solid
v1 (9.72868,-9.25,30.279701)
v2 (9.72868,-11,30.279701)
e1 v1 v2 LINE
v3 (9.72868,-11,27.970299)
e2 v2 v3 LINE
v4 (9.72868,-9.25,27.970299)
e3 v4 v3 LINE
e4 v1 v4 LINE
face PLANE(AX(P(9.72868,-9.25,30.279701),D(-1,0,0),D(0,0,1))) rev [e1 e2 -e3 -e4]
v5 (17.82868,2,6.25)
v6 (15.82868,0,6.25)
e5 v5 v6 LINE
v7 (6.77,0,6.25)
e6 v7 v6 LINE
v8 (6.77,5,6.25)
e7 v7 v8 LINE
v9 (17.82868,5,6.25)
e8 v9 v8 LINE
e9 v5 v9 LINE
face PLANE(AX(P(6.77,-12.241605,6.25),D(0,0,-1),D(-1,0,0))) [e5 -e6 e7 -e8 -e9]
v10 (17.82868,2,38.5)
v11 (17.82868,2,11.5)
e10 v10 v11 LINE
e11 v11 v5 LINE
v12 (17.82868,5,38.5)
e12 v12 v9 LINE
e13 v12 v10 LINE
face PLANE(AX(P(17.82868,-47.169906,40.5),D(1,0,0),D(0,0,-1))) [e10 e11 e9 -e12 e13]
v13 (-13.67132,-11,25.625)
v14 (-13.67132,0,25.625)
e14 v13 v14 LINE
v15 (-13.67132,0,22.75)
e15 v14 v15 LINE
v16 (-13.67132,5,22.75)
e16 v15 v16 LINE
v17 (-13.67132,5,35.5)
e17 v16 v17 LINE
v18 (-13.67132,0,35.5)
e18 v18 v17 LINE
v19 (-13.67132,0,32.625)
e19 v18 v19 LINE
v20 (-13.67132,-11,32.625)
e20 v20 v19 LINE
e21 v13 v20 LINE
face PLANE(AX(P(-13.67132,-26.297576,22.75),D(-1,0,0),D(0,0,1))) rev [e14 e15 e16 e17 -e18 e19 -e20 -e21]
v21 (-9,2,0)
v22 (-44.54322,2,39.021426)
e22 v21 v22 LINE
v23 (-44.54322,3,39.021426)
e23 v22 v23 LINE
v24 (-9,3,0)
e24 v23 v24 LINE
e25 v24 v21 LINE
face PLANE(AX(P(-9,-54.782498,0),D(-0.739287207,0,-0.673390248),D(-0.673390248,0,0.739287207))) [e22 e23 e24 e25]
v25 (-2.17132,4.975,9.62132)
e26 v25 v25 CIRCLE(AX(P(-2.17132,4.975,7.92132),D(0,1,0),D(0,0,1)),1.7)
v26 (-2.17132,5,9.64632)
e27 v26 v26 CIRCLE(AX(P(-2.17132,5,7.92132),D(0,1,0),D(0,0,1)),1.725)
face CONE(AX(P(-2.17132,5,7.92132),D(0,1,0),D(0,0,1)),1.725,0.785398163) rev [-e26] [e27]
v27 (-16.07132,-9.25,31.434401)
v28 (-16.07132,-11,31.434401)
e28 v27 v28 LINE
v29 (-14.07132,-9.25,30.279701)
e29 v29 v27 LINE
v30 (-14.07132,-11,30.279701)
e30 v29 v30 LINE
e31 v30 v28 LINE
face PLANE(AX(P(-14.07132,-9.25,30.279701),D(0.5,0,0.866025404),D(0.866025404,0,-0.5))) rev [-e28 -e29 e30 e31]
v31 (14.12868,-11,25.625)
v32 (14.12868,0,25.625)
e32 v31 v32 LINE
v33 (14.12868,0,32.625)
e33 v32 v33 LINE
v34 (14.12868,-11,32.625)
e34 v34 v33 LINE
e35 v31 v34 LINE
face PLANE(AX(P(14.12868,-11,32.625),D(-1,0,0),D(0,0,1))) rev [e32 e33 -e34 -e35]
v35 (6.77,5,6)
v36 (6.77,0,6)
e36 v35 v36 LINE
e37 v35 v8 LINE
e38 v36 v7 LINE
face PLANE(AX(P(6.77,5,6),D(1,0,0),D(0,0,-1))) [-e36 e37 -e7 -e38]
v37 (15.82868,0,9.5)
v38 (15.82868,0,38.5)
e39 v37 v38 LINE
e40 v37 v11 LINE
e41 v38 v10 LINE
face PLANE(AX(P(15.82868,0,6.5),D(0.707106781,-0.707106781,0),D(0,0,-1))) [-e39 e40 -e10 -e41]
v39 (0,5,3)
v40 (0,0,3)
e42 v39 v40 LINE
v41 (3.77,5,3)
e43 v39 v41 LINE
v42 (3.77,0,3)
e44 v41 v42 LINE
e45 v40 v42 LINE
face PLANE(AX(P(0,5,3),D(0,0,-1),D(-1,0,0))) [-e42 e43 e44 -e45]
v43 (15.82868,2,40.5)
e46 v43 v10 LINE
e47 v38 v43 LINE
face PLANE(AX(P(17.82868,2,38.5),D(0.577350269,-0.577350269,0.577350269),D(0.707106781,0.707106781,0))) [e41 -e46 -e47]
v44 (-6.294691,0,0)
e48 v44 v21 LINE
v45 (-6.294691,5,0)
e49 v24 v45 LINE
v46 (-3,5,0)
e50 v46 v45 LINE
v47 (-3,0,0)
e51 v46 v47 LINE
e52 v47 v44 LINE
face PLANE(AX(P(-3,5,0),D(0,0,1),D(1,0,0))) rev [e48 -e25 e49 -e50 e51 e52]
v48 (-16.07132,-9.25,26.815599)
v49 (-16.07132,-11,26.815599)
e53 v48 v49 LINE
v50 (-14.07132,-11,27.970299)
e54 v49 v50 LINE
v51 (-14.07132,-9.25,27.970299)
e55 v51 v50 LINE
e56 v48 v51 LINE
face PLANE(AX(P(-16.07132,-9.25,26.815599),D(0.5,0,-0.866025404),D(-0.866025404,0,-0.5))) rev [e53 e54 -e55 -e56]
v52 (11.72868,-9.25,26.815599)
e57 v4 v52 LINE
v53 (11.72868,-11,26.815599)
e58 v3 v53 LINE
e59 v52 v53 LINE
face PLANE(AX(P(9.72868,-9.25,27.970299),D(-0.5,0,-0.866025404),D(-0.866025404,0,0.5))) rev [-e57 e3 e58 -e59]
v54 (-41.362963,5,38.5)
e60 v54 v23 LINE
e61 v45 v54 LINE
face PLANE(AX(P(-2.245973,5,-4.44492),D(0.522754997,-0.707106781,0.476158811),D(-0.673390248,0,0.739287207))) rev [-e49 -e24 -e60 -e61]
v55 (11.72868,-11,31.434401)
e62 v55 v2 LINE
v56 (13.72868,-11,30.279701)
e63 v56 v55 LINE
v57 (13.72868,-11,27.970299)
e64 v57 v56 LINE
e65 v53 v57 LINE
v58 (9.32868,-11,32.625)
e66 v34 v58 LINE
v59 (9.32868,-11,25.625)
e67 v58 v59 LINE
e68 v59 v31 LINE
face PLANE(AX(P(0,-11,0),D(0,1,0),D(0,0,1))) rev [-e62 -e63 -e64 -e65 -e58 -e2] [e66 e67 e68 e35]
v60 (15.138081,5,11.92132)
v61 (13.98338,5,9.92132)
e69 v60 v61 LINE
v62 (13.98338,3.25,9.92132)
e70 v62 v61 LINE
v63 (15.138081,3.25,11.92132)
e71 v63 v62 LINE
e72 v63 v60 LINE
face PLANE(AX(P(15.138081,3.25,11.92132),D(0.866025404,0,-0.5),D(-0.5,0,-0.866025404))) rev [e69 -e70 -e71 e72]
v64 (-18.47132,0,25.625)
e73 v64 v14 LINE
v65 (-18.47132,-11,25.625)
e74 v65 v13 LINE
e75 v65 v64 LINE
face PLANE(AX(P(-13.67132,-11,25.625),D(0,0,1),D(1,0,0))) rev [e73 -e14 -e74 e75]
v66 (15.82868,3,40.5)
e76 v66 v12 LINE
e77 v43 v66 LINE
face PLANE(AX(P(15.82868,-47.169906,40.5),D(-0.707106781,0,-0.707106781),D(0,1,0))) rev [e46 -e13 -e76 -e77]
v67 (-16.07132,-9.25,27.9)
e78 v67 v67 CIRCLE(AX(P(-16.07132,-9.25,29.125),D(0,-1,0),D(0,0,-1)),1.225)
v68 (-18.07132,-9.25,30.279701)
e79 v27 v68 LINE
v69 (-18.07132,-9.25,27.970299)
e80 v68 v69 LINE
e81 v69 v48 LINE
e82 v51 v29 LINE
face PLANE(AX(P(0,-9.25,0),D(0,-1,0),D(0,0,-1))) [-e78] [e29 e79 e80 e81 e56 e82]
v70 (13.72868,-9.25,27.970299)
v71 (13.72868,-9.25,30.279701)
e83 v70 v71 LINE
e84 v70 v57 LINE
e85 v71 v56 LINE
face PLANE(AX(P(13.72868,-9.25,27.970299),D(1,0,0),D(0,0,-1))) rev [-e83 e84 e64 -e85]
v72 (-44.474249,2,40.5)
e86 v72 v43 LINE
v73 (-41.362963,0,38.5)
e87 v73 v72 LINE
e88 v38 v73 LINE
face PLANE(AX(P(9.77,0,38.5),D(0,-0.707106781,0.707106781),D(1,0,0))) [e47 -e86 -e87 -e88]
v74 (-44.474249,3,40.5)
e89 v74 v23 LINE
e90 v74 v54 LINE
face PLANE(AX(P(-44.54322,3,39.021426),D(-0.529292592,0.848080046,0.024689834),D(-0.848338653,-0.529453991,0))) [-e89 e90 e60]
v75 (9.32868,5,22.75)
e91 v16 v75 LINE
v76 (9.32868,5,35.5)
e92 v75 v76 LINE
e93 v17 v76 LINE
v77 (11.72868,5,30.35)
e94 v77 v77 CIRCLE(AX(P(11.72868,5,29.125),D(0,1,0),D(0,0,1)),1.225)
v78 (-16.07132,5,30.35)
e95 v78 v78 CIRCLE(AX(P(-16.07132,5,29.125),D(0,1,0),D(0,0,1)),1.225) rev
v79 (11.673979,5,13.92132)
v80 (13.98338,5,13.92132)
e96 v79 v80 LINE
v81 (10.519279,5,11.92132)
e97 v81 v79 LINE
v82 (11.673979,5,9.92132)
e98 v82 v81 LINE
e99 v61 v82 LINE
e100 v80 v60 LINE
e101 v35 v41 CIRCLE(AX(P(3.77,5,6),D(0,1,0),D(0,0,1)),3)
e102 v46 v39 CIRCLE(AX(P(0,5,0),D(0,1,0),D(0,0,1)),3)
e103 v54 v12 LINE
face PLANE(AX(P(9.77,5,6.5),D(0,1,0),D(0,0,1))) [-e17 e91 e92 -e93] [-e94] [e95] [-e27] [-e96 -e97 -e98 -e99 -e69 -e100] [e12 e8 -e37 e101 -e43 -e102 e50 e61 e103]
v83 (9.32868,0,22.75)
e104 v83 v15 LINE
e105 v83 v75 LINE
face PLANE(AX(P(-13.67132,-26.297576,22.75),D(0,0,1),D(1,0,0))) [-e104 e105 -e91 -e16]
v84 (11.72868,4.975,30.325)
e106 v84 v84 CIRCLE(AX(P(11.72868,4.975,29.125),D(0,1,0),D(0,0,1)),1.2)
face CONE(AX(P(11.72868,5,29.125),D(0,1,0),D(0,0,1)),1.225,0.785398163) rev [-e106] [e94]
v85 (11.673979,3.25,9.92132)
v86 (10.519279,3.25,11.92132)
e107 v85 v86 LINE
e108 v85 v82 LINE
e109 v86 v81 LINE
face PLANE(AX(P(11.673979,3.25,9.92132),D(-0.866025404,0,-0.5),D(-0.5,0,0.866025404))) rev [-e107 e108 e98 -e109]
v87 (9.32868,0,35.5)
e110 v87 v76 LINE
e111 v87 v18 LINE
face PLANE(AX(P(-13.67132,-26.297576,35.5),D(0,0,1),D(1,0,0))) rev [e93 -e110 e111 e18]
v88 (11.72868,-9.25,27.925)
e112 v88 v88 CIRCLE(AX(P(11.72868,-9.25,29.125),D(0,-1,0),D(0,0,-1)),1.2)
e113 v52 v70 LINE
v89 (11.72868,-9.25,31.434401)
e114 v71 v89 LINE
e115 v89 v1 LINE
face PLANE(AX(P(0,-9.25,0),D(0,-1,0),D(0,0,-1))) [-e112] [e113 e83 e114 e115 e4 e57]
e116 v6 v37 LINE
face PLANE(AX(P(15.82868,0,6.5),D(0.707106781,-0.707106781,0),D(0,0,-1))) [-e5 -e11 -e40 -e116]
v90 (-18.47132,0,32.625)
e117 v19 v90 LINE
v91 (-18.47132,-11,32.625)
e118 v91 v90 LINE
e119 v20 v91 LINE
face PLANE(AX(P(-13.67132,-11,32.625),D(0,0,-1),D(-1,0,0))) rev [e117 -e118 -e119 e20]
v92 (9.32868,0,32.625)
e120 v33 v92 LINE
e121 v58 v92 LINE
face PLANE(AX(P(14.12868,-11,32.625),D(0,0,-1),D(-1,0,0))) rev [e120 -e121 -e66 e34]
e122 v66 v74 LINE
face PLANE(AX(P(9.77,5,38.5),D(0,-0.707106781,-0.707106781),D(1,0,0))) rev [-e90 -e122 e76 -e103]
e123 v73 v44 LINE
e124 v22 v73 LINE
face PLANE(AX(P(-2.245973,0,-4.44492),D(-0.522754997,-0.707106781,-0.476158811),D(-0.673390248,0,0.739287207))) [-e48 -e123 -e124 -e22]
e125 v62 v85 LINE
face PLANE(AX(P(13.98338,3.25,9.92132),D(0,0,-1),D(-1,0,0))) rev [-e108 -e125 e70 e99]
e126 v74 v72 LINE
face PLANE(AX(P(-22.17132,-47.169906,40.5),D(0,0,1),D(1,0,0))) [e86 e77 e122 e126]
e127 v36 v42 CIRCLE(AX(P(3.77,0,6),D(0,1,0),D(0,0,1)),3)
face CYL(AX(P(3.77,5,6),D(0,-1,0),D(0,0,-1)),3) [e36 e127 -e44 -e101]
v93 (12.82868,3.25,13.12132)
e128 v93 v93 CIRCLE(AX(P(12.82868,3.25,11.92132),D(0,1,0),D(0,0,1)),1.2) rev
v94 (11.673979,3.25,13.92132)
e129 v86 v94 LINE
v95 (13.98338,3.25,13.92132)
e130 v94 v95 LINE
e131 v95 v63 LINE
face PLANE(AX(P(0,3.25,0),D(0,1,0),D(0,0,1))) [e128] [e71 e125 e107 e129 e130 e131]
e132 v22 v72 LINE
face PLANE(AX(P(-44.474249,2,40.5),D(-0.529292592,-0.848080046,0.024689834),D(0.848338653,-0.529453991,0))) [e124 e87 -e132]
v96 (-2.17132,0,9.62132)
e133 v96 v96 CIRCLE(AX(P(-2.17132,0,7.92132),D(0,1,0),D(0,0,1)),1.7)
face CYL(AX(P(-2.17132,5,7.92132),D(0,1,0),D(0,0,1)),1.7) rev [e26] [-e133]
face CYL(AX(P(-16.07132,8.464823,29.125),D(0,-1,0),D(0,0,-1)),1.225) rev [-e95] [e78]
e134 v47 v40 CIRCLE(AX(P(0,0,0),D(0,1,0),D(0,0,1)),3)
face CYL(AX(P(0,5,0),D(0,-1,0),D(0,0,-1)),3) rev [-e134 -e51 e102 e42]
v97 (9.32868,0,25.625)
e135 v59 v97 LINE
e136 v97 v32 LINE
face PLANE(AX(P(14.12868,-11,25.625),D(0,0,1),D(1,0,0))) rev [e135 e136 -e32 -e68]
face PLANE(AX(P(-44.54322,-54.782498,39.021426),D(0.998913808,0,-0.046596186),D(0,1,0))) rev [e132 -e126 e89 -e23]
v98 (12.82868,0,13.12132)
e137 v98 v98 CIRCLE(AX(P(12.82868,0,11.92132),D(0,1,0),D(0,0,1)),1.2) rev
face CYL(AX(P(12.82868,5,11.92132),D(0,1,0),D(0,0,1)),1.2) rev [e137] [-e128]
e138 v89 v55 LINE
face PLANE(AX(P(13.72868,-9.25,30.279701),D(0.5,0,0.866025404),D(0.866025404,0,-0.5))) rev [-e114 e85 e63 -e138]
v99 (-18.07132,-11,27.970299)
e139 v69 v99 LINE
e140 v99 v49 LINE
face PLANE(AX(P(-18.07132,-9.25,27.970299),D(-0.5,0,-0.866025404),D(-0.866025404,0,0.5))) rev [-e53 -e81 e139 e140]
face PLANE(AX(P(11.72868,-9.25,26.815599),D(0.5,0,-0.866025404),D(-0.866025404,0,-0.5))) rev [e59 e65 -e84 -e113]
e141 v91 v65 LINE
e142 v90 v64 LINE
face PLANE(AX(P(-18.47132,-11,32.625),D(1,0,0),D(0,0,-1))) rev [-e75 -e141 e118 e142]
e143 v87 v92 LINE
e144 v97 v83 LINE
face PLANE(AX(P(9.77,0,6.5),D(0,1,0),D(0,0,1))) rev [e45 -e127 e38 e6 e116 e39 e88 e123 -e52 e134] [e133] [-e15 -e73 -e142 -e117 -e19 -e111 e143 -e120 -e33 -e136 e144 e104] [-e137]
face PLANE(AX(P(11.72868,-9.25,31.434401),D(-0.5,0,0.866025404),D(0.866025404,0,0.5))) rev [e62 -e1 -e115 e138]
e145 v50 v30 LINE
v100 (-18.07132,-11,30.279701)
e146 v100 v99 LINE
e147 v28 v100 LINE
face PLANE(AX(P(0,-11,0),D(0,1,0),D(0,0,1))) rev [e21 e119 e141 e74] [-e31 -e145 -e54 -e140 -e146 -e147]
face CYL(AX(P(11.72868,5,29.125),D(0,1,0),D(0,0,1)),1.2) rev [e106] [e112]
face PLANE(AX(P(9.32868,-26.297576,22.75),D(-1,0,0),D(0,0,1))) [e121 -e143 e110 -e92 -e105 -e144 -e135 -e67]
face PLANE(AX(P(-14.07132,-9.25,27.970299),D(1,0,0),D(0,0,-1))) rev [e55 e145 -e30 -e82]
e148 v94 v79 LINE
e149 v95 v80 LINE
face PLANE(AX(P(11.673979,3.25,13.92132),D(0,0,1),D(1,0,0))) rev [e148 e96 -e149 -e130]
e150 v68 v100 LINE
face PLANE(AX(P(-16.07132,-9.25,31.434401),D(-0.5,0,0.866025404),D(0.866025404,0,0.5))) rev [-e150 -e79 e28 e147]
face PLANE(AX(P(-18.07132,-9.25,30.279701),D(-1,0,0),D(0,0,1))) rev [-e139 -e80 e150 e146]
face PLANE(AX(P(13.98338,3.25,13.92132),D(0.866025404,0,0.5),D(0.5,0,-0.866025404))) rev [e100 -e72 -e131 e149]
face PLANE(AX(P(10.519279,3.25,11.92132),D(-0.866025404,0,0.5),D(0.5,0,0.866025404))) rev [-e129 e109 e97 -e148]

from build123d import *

# Parameters (mm, degrees)
BOSS_EXTRUDE1_DEPTH            = 5
M3_CLEARANCE_HOLE1_D           = 3.4
M3_CLEARANCE_HOLE1_CSINK_D     = 3.45
M3_CLEARANCE_HOLE1_CSINK_ANGLE = 90
SKETCH4_W                      = 40
SKETCH4_H                      = 25
BOSS_EXTRUDE2_DEPTH            = 5
SKETCH5_W                      = 8.058679656
SKETCH5_H                      = 6
BOSS_EXTRUDE3_DEPTH            = 5
SKETCH8_W                      = 23
SKETCH8_H                      = 12.75
CUT_EXTRUDE1_DEPTH             = 5
M2_CLEARANCE_HOLE1_D           = 2.4
M2_CLEARANCE_HOLE1_CSINK_D     = 2.45
M2_CLEARANCE_HOLE1_CSINK_ANGLE = 90
SKETCH11_W                     = 4.8
SKETCH11_H                     = 7
BOSS_EXTRUDE4_DEPTH            = 11
CUT_EXTRUDE2_DEPTH             = 1.75
SKETCH13_R                     = 1.225
SKETCH13_R_2                   = 1.2
CUT_EXTRUDE3_DEPTH             = 14.25
M2_CLEARANCE_HOLE2_D           = 2.4
M2_CLEARANCE_HOLE2_DEPTH       = 5
M2_CLEARANCE_HOLE2_CSINK_D     = 2.45
M2_CLEARANCE_HOLE2_CSINK_ANGLE = 90
M2_CLEARANCE_HOLE2_TIP         = 0.721032743
CUT_EXTRUDE4_DEPTH             = 1.75
BOSS_EXTRUDE5_START            = -5
BOSS_EXTRUDE5_DEPTH            = 5
CHAMFER2_SIZE                  = 2


with BuildPart() as part:
    # Sketch1 → Boss-Extrude1 (new body)
    with BuildSketch(Plane(origin=(0, 0, 0), x_dir=(1, 0, 0), z_dir=(0, 1, 0))):
        with BuildLine():
            Line((-3, 0), (-9, 0))
            Line((-9, 0), (-9, -15.5))
            Line((-9, -15.5), (9.77, -15.5))
            Line((9.77, -15.5), (9.77, -9.5))
            ThreePointArc((9.77, -9.5), (7.648679656, -8.621320344), (6.77, -6.5))
            Line((6.77, -6.5), (6.77, -6))
            ThreePointArc((6.77, -6), (5.891320344, -3.878679656), (3.77, -3))
            Line((3.77, -3), (0, -3))
            ThreePointArc((0, -3), (-2.121320344, -2.121320344), (-3, 0))
        make_face()
    extrude(amount=BOSS_EXTRUDE1_DEPTH)

    # M3 Clearance Hole1 (through all)
    with Locations(Plane(origin=(0, 5, 0), x_dir=(1, 0, 0), z_dir=(0, 1, 0))):
        with Locations((-2.171320344, -7.921320344)):
            CounterSinkHole(M3_CLEARANCE_HOLE1_D / 2, M3_CLEARANCE_HOLE1_CSINK_D / 2, counter_sink_angle=M3_CLEARANCE_HOLE1_CSINK_ANGLE)

    # Sketch4 → Boss-Extrude2 (add)
    with BuildSketch(Plane(origin=(0, 5, 0), x_dir=(1, 0, 0), z_dir=(0, 1, 0))):
        with Locations((-2.171320344, -28)):
            Rectangle(SKETCH4_W, SKETCH4_H)
    extrude(amount=-BOSS_EXTRUDE2_DEPTH)

    # Sketch5 → Boss-Extrude3 (add)
    with BuildSketch(Plane(origin=(0, 5, 0), x_dir=(1, 0, 0), z_dir=(0, 1, 0))):
        with Locations((13.799339828, -12.5)):
            Rectangle(SKETCH5_W, SKETCH5_H)
        Polygon((-9, 0), (-45.89, -40.5), (-22.171320344, -40.5), (-22.171320344, -15.5), (-9, -15.5), align=None)
    extrude(amount=-BOSS_EXTRUDE3_DEPTH)

    # Sketch8 → Cut-Extrude1 (cut)
    with BuildSketch(Plane(origin=(0, 5, 0), x_dir=(1, 0, 0), z_dir=(0, 1, 0))):
        with Locations((-2.171320344, -29.125)):
            Rectangle(SKETCH8_W, SKETCH8_H)
    extrude(amount=-CUT_EXTRUDE1_DEPTH, mode=Mode.SUBTRACT)

    # M2 Clearance Hole1 (through all)
    with Locations(Plane(origin=(0, 5, 0), x_dir=(1, 0, 0), z_dir=(0, 1, 0))):
        with Locations((-16.071320344, -29.125), (11.728679656, -29.125)):
            CounterSinkHole(M2_CLEARANCE_HOLE1_D / 2, M2_CLEARANCE_HOLE1_CSINK_D / 2, counter_sink_angle=M2_CLEARANCE_HOLE1_CSINK_ANGLE)

    # Sketch11 → Boss-Extrude4 (add)
    with BuildSketch(Plane.XZ):
        with Locations((-16.071320344, 29.125)):
            Rectangle(SKETCH11_W, SKETCH11_H)
        with Locations((11.728679656, 29.125)):
            Rectangle(SKETCH11_W, SKETCH11_H)
    extrude(amount=BOSS_EXTRUDE4_DEPTH)

    # Sketch12 → Cut-Extrude2 (cut)
    with BuildSketch(Plane.XZ.offset(11)):
        Polygon((-16.071320344, 26.815598923), (-14.071320344, 27.970299462), (-14.071320344, 30.279700538), (-16.071320344, 31.434401077), (-18.071320344, 30.279700538), (-18.071320344, 27.970299462), align=None)
        Polygon((11.728679656, 26.815598923), (13.728679656, 27.970299462), (13.728679656, 30.279700538), (11.728679656, 31.434401077), (9.728679656, 30.279700538), (9.728679656, 27.970299462), align=None)
    extrude(amount=-CUT_EXTRUDE2_DEPTH, mode=Mode.SUBTRACT)

    # Sketch13 → Cut-Extrude3 (cut)
    with BuildSketch(Plane.XZ.offset(9.25)):
        with Locations(Location((-16.071320344, 29.125, 0), (0, 0, 270))):
            Circle(SKETCH13_R)
        with Locations(Location((11.728679656, 29.125, 0), (0, 0, 90))):
            Circle(SKETCH13_R_2)
    extrude(amount=-CUT_EXTRUDE3_DEPTH, mode=Mode.SUBTRACT)

    # Chamfer1
    # the kernel refuses this chamfer: 2, 1.41575134 mm, written as the material it takes off along each edge
    with BuildSketch(Plane(origin=(16.495346323, 1.333333333, 39.166666667), x_dir=(0, 0.7071067811865475, 0.7071067811865475), z_dir=(0.5773502691896257, -0.5773502691896258, 0.5773502691896258))) as chamfer1_piece_1:
        Polygon((-1.414213562, 0.816496581), (1.414213562, 0.816496581), (0, -1.632993162), align=None)
    extrude(amount=2.540341184, mode=Mode.SUBTRACT)
    with BuildSketch(Plane(origin=(-43.46014374, 3.666666667, 39.340475196), x_dir=(-0.8384813090956955, -0.5273042113731956, 0.13747495395620568), z_dir=(-0.5292925924408943, 0.848080045562193, 0.024689834070442226))) as chamfer1_piece_2:
        Polygon((-2.577063376, -0.491006629), (1.215813595, -0.491006629), (1.361249781, 0.982013258), align=None)
    extrude(amount=2.690057467, mode=Mode.SUBTRACT)
    with BuildSketch(Plane(origin=(-43.46014374, 1.333333333, 39.340475196), x_dir=(0.04659618615065125, 0, 0.9989138078113716), z_dir=(-0.5292925924408943, -0.848080045562193, 0.02468983407044242))) as chamfer1_piece_3:
        Polygon((-0.369170259, 1.258174681), (1.111011916, 1.258174681), (-0.741841657, -2.516349362), align=None)
    extrude(amount=2.690057467, mode=Mode.SUBTRACT)
    with BuildSketch(Plane(origin=(17.828679656, 10.143365976, 40.5), x_dir=(-0.9996219169112968, 0, 0.027495876610585623), z_dir=(0, -1, 0)), Plane(origin=(17.828679656, 10.143365976, 9.5), x_dir=(0.027495876610585623, 0, 0.9996219169112968), z_dir=(0, -1, 0))) as chamfer1_piece_4:
        with BuildLine():
            Line((2.05734639, 0), (-0.11309431, 2.054235587))
            Line((-0.11309431, 2.054235587), (-0.153079186, 2.053135752))
            ThreePointArc((-0.153079186, 2.053135752), (-0.068258454, 1.026795659), (-0.039984877, -0.001099835))
            Line((-0.039984877, -0.001099835), (0.001099835, -0.039984877))
            ThreePointArc((0.001099835, -0.039984877), (1.028995329, -0.011711299), (2.058446225, -0.039984877))
            Line((2.058446225, -0.039984877), (2.05734639, 0))
        make_face()
    extrude(amount=15.286731952, mode=Mode.SUBTRACT)
    with BuildSketch(Plane(origin=(-51.033365976, 5, 40.5), x_dir=(0, 0.02749587661058651, -0.9996219169112968), z_dir=(1, 0, 0))) as chamfer1_piece_5:
        with BuildLine():
            Line((2.05734639, 0), (-0.11309431, -2.054235587))
            Line((-0.11309431, -2.054235587), (-0.153079186, -2.053135752))
            ThreePointArc((-0.153079186, -2.053135752), (-0.068258454, -1.026795659), (-0.039984877, 0.001099835))
            Line((-0.039984877, 0.001099835), (0.001099835, 0.039984877))
            ThreePointArc((0.001099835, 0.039984877), (1.028995329, 0.011711299), (2.058446225, 0.039984877))
            Line((2.058446225, 0.039984877), (2.05734639, 0))
        make_face()
    extrude(amount=74.005411608, mode=Mode.SUBTRACT)
    with BuildSketch(Plane(origin=(17.828679656, 0, 45.643365976), x_dir=(-0.9996219169112968, -0.027495876610586365, 0), z_dir=(0, 0, -1))) as chamfer1_piece_6:
        with BuildLine():
            Line((2.05734639, 0), (-0.11309431, 2.054235587))
            Line((-0.11309431, 2.054235587), (-0.153079186, 2.053135752))
            ThreePointArc((-0.153079186, 2.053135752), (-0.068258454, 1.026795659), (-0.039984877, -0.001099835))
            Line((-0.039984877, -0.001099835), (0.001099835, -0.039984877))
            ThreePointArc((0.001099835, -0.039984877), (1.028995329, -0.011711299), (2.058446225, -0.039984877))
            Line((2.058446225, -0.039984877), (2.05734639, 0))
        make_face()
    extrude(amount=41.286731952, mode=Mode.SUBTRACT)
    with BuildSketch(Plane(origin=(-51.033365976, 0, 40.5), x_dir=(0, -0.02749587661058639, -0.9996219169112968), z_dir=(1, 0, 0))) as chamfer1_piece_7:
        with BuildLine():
            Line((2.05734639, 0), (-0.11309431, 2.054235587))
            Line((-0.11309431, 2.054235587), (-0.153079186, 2.053135752))
            ThreePointArc((-0.153079186, 2.053135752), (-0.068258454, 1.026795659), (-0.039984877, -0.001099835))
            Line((-0.039984877, -0.001099835), (0.001099835, -0.039984877))
            ThreePointArc((0.001099835, -0.039984877), (1.028995329, -0.011711299), (2.058446225, -0.039984877))
            Line((2.058446225, -0.039984877), (2.05734639, 0))
        make_face()
    extrude(amount=74.005411608, mode=Mode.SUBTRACT)
    with BuildSketch(Plane(origin=(-5.536507509, 5, -3.802424665), x_dir=(0.7390076945383709, 0.02749587661058648, 0.673135650654827), z_dir=(-0.6733902481197388, 0, 0.7392872065288542))) as chamfer1_piece_8:
        with BuildLine():
            Line((2.05734639, 0), (-0.11309431, -2.054235587))
            Line((-0.11309431, -2.054235587), (-0.153079186, -2.053135752))
            ThreePointArc((-0.153079186, -2.053135752), (-0.068258454, -1.026795659), (-0.039984877, 0.001099835))
            Line((-0.039984877, 0.001099835), (0.001099835, 0.039984877))
            ThreePointArc((0.001099835, 0.039984877), (1.028995329, 0.011711299), (2.058446225, 0.039984877))
            Line((2.058446225, 0.039984877), (2.05734639, 0))
        make_face()
    extrude(amount=65.069230069, mode=Mode.SUBTRACT)
    with BuildSketch(Plane(origin=(-5.536507509, 0, -3.802424665), x_dir=(0.7390076945383709, -0.027495876610586358, 0.673135650654827), z_dir=(-0.6733902481197388, 0, 0.7392872065288542))) as chamfer1_piece_9:
        with BuildLine():
            Line((2.05734639, 0), (-0.11309431, 2.054235587))
            Line((-0.11309431, 2.054235587), (-0.153079186, 2.053135752))
            ThreePointArc((-0.153079186, 2.053135752), (-0.068258454, 1.026795659), (-0.039984877, -0.001099835))
            Line((-0.039984877, -0.001099835), (0.001099835, -0.039984877))
            ThreePointArc((0.001099835, -0.039984877), (1.028995329, -0.011711299), (2.058446225, -0.039984877))
            Line((2.058446225, -0.039984877), (2.05734639, 0))
        make_face()
    extrude(amount=65.069230069, mode=Mode.SUBTRACT)
    with BuildSketch(Plane(origin=(-45.89, 10.143365976, 40.5), x_dir=(0.6528083008443235, 0, -0.7575231497114442), z_dir=(0, -1, 0))) as chamfer1_piece_10:
        with BuildLine():
            Line((2.05734639, 0), (0.86611167, 1.127456168))
            Line((0.86611167, 1.127456168), (0.835810744, 1.1535685))
            ThreePointArc((0.835810744, 1.1535685), (0.433022923, 0.563756447), (-0.030300926, 0.026112332))
            Line((-0.030300926, 0.026112332), (0.001099835, -0.039984877))
            ThreePointArc((0.001099835, -0.039984877), (1.028995329, -0.011711299), (2.058446225, -0.039984877))
            Line((2.058446225, -0.039984877), (2.05734639, 0))
        make_face()
    extrude(amount=15.286731952, mode=Mode.SUBTRACT)

    # M2 Clearance Hole2
    with Locations(Plane(origin=(0, 5, 0), x_dir=(1, 0, 0), z_dir=(0, 1, 0))):
        with Locations((12.828679656, -11.921320344)):
            CounterSinkHole(M2_CLEARANCE_HOLE2_D / 2, M2_CLEARANCE_HOLE2_CSINK_D / 2, depth=M2_CLEARANCE_HOLE2_DEPTH, counter_sink_angle=M2_CLEARANCE_HOLE2_CSINK_ANGLE)
            with Locations((0, 0, -(M2_CLEARANCE_HOLE2_DEPTH + M2_CLEARANCE_HOLE2_TIP / 2))):  # 118° drill point
                Cone(0, M2_CLEARANCE_HOLE2_D / 2, M2_CLEARANCE_HOLE2_TIP, mode=Mode.SUBTRACT)

    # Sketch18 → Cut-Extrude4 (cut)
    with BuildSketch(Plane(origin=(0, 5, 0), x_dir=(1, 0, 0), z_dir=(0, 1, 0))):
        Polygon((11.673979118, -13.921320344), (13.983380195, -13.921320344), (15.138080733, -11.921320344), (13.983380195, -9.921320344), (11.673979118, -9.921320344), (10.51927858, -11.921320344), align=None)
    extrude(amount=-CUT_EXTRUDE4_DEPTH, mode=Mode.SUBTRACT)

    # Sketch19 → Boss-Extrude5 (add)
    with BuildSketch(Plane(origin=(0, 5, 0), x_dir=(1, 0, 0), z_dir=(0, 1, 0)).offset(BOSS_EXTRUDE5_START)):
        with BuildLine():
            Line((17.828679656, -6.25), (17.828679656, -11.5))
            Line((17.828679656, -11.5), (15.828679656, -9.5))
            Line((15.828679656, -9.5), (9.77, -9.5))
            ThreePointArc((9.77, -9.5), (7.648679656, -8.621320344), (6.77, -6.5))
            Line((6.77, -6.5), (6.77, -6.25))
            Line((6.77, -6.25), (17.828679656, -6.25))
        make_face()
    extrude(amount=BOSS_EXTRUDE5_DEPTH)

    # Chamfer2
    chamfer2_edges = [part.edges().sort_by_distance(p)[0] for p in [
        (17.828679656, 0, 8.875),
    ]]
    chamfer(chamfer2_edges, length=CHAMFER2_SIZE)


solid = part.part
